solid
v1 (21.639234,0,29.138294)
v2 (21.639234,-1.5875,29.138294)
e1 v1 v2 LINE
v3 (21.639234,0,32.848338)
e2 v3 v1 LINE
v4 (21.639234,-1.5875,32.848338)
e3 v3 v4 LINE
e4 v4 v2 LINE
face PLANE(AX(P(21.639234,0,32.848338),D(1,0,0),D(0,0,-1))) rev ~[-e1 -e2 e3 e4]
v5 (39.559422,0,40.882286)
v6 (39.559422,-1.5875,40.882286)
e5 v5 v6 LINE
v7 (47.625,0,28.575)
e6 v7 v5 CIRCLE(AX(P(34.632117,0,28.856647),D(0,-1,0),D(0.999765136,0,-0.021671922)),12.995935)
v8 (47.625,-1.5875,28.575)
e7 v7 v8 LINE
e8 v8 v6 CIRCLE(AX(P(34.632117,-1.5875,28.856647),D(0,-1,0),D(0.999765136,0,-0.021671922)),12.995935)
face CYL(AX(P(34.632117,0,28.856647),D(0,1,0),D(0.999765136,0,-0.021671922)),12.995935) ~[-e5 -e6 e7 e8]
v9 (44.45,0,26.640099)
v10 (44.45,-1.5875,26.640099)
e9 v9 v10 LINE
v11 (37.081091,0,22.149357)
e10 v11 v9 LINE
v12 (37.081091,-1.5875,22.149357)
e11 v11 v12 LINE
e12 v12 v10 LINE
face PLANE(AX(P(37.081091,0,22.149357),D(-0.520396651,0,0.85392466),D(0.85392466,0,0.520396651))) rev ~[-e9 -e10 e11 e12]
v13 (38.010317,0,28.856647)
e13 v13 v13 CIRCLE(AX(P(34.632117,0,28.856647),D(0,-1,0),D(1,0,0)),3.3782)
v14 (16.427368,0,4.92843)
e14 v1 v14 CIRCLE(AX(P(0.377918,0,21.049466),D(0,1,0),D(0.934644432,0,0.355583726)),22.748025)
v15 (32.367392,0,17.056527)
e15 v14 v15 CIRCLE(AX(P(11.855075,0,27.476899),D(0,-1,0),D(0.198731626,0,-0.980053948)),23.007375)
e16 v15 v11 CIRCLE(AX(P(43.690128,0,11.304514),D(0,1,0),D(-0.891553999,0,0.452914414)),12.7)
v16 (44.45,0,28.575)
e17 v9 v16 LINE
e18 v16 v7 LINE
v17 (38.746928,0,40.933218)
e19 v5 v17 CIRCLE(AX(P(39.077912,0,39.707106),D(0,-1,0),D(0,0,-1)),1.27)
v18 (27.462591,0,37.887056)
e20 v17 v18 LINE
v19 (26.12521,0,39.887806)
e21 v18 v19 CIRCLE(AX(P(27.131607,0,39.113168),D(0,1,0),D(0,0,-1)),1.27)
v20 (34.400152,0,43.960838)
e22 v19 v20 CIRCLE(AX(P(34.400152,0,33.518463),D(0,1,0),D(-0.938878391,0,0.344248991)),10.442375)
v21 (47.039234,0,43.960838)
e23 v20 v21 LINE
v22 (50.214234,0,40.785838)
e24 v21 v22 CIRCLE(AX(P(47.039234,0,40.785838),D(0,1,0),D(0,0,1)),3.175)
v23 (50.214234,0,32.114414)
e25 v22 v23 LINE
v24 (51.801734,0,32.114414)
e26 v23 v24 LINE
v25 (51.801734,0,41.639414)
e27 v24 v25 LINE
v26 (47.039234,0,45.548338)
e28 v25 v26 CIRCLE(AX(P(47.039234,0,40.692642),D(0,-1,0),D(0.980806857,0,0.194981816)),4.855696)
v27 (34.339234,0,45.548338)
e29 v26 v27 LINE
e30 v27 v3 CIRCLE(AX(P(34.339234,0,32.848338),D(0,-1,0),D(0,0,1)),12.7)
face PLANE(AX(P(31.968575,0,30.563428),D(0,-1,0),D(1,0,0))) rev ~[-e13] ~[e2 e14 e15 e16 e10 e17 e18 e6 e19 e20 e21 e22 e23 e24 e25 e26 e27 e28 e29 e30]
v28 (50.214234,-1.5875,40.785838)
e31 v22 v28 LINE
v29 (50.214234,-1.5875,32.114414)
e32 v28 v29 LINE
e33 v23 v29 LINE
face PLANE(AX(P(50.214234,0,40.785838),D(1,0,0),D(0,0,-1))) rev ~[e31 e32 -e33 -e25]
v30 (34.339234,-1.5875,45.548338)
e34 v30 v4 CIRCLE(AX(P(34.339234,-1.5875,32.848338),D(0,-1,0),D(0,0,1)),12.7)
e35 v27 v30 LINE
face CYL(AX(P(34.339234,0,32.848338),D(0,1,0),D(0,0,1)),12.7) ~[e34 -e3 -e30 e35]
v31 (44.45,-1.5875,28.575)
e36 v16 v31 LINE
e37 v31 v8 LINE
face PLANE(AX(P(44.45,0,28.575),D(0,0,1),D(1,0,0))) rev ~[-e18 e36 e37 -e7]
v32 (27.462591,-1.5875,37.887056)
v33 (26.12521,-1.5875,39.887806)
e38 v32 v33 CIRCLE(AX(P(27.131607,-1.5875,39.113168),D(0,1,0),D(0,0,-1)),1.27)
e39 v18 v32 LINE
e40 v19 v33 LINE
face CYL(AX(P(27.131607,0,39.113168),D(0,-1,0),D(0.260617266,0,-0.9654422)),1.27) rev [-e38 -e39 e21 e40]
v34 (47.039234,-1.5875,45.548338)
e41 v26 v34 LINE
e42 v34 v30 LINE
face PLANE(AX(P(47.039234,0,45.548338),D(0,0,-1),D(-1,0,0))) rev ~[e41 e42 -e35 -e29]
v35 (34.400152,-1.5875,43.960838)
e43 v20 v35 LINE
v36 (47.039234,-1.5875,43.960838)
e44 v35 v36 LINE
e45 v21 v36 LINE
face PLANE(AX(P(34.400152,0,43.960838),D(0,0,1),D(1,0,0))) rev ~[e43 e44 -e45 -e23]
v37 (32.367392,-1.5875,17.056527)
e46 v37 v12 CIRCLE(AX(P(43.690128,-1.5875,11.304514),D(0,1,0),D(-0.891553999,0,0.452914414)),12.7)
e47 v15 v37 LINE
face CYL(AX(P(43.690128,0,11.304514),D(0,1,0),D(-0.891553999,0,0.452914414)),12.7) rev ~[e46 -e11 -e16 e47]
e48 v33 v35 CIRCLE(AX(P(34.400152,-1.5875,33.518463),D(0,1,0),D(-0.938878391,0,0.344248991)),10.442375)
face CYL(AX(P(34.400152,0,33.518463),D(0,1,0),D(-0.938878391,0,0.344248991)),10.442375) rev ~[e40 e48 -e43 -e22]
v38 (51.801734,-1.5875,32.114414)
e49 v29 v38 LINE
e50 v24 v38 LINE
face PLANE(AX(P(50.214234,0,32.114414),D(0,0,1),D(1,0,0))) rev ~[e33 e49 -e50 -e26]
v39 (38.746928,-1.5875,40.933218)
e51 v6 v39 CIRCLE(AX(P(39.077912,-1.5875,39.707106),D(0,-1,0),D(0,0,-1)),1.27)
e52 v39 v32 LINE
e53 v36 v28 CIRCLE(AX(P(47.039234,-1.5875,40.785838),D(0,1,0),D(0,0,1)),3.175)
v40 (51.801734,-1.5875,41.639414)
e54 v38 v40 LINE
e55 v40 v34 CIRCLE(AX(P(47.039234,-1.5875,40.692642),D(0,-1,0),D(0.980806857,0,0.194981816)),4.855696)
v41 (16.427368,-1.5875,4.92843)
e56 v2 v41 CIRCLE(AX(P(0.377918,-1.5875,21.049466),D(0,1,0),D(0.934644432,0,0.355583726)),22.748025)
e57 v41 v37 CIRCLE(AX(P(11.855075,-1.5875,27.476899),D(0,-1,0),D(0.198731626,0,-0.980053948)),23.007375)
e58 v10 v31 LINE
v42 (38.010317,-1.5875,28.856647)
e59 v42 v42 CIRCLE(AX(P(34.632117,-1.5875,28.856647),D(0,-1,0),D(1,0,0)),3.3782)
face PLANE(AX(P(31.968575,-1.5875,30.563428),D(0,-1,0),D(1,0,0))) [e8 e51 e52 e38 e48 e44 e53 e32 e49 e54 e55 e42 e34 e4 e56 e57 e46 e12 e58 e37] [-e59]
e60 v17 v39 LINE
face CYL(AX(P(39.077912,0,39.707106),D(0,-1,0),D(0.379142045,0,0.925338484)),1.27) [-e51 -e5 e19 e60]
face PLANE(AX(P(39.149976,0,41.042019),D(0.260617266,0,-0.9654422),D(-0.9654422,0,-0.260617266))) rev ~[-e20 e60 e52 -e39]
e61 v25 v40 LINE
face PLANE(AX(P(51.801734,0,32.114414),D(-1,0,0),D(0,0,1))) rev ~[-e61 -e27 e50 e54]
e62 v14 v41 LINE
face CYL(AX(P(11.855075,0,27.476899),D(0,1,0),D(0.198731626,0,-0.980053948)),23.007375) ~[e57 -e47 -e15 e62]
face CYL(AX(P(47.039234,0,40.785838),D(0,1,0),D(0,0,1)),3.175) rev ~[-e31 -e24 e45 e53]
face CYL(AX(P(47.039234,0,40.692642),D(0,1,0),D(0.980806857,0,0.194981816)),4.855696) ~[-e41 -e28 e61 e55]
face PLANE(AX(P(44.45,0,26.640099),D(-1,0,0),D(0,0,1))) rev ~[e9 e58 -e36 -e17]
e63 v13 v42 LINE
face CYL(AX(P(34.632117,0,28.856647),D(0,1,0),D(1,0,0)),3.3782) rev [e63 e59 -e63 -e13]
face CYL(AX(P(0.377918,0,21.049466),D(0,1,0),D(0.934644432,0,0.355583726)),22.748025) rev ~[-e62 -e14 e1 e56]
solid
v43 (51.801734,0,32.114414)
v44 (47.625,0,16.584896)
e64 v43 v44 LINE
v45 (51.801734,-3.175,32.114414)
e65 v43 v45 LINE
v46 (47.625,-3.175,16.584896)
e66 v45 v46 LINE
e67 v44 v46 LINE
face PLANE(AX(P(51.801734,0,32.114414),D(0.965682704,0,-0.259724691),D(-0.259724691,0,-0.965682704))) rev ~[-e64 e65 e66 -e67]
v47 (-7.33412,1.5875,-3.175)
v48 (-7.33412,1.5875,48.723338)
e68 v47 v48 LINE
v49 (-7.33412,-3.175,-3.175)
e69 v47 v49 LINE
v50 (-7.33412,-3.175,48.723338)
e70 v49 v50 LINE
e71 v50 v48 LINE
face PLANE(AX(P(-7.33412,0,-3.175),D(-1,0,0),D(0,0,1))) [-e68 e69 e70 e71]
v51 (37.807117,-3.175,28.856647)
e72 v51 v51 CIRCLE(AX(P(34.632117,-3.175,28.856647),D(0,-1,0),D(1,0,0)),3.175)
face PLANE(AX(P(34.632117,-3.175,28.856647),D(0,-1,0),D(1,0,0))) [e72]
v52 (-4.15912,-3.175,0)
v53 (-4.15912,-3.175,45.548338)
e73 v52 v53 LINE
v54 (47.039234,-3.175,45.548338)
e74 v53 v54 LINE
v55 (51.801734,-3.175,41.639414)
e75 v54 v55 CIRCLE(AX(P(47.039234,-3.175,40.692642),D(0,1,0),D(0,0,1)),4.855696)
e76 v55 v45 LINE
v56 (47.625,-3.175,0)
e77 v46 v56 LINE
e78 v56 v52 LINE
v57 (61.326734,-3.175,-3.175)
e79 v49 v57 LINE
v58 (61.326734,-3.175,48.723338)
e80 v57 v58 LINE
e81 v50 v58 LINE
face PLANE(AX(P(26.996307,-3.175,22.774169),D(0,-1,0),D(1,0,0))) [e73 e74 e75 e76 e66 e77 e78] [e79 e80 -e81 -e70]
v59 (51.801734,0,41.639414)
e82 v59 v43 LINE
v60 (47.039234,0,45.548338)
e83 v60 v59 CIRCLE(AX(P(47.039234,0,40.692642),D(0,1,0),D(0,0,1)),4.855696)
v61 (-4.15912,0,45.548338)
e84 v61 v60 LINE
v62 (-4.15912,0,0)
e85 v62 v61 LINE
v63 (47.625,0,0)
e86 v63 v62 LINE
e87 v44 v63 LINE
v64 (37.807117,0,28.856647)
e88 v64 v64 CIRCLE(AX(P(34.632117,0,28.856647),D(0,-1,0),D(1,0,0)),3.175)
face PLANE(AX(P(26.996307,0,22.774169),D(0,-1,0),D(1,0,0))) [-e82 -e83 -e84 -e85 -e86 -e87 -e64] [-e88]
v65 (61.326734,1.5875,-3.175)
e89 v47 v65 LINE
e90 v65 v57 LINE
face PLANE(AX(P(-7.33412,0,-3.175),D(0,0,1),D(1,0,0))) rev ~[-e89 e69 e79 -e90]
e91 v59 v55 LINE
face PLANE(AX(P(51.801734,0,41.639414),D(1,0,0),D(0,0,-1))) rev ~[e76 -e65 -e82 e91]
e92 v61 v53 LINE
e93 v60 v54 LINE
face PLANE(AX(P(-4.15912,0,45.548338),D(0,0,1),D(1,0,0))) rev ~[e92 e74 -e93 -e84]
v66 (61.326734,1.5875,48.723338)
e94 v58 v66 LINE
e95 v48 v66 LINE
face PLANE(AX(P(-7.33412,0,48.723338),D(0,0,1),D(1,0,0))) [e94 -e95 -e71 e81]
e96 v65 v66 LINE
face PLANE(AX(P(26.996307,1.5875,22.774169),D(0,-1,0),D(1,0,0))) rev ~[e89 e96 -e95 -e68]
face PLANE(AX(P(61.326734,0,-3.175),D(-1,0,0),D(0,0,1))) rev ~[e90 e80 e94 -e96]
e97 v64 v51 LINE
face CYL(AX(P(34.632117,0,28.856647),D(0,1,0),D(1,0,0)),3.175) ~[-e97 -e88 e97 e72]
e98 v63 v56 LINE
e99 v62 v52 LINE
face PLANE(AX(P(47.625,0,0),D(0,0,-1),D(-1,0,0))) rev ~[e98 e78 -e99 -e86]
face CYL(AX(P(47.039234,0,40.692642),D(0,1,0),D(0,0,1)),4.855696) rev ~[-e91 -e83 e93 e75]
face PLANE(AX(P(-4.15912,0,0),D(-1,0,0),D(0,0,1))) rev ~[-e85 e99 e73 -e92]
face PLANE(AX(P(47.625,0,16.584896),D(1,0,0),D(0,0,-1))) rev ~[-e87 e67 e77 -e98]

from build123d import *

# Parameters (mm, degrees)
F0_R     = 3.3782
F1_DEPTH = 1.5875
F2_R     = 1.27
F0_W     = 68.6608534306
F0_H     = 51.8983377281
F0_R_2   = 3.175
F3_DEPTH = 1.5875
F4_DEPTH = 3.175


with BuildPart() as f1:
    # F0 (on Front) → F1 (new body)
    with BuildSketch(Plane.XZ):
        with BuildLine():
            Line((37.0810907311, 22.1493569333), (44.45, 26.6400993653))
            Line((44.45, 26.6400993653), (44.45, 28.575))
            Line((44.45, 28.575), (47.625, 28.575))
            ThreePointArc((47.625, 28.575), (45.3798217244, 36.1628892804), (39.1499755584, 41.0420189125))
            Line((39.1499755584, 41.0420189125), (24.5960312701, 37.1132397757))
            ThreePointArc((24.5960312701, 37.1132397757), (28.4208043201, 42.0794558253), (34.4001515145, 43.9608377281))
            Line((34.4001515145, 43.9608377281), (47.0392336093, 43.9608377281))
            Line((47.0392336093, 43.9608377281), (47.0392336093, 45.5483377281))
            Line((47.0392336093, 45.5483377281), (34.3392336093, 45.5483377281))
            ThreePointArc((34.3392336093, 45.5483377281), (25.3589774882, 41.8285938491), (21.6392336093, 32.8483377281))
            Line((21.6392336093, 32.8483377281), (21.6392336093, 29.1382938078))
            ThreePointArc((21.6392336093, 29.1382938078), (22.6164587492, 16.2619847329), (16.4273683424, 4.9284299373))
            ThreePointArc((16.4273683424, 4.9284299373), (25.7864104877, 9.1668684971), (32.3673924103, 17.0565268063))
            ThreePointArc((32.3673924103, 17.0565268063), (34.369647916, 19.9311380738), (37.0810907311, 22.1493569333))
        make_face()
        with Locations((34.6321168046, 28.8566469039)):
            Circle(F0_R, mode=Mode.SUBTRACT)
        with BuildLine():
            Line((50.2142336093, 32.1144140998), (51.8017336093, 32.1144140998))
            Line((51.8017336093, 32.1144140998), (51.8017336093, 41.6394140998))
            ThreePointArc((51.8017336093, 41.6394140998), (50.1198622051, 44.4459750797), (47.0392336093, 45.5483377281))
            Line((47.0392336093, 45.5483377281), (47.0392336093, 43.9608377281))
            ThreePointArc((47.0392336093, 43.9608377281), (49.2842976395, 43.0309017583), (50.2142336093, 40.7858377281))
            Line((50.2142336093, 40.7858377281), (50.2142336093, 32.1144140998))
        make_face()
    extrude(amount=F1_DEPTH)

    # F2
    f2_edges = [f1.edges().sort_by_distance(p)[0] for p in [
        (24.596031, -0.79375, 37.11324),
        (39.149976, -0.79375, 41.042019),
    ]]
    fillet(f2_edges, radius=F2_R)


with BuildPart() as f3:
    # F0 (on Front) → F3 (new body)
    with BuildSketch(Plane.XZ):
        with Locations((26.9963068939, 22.774168864)):
            Rectangle(F0_W, F0_H)
        Polygon((47.625, 0), (0, 0), (-4.1591198214, 0), (-4.1591198214, 45.5483377281), (34.3392336093, 45.5483377281), (47.0392336093, 45.5483377281), (58.1517336093, 45.5483377281), (58.1517336093, 0), align=None, mode=Mode.SUBTRACT)
        with BuildLine():
            Line((-4.1591198214, 0), (0, 0))
            Line((0, 0), (47.625, 0))
            Line((47.625, 0), (47.625, 16.5848955512))
            Line((47.625, 16.5848955512), (44.45, 26.6400993653))
            Line((44.45, 26.6400993653), (37.0810907311, 22.1493569333))
            ThreePointArc((37.0810907311, 22.1493569333), (34.369647916, 19.9311380738), (32.3673924103, 17.0565268063))
            ThreePointArc((32.3673924103, 17.0565268063), (25.7864104877, 9.1668684971), (16.4273683424, 4.9284299373))
            ThreePointArc((16.4273683424, 4.9284299373), (22.6164587492, 16.2619847329), (21.6392336093, 29.1382938078))
            Line((21.6392336093, 29.1382938078), (21.6392336093, 32.8483377281))
            ThreePointArc((21.6392336093, 32.8483377281), (25.3589774882, 41.8285938491), (34.3392336093, 45.5483377281))
            Line((34.3392336093, 45.5483377281), (-4.1591198214, 45.5483377281))
            Line((-4.1591198214, 45.5483377281), (-4.1591198214, 0))
        make_face()
        with BuildLine():
            Line((37.0810907311, 22.1493569333), (44.45, 26.6400993653))
            Line((44.45, 26.6400993653), (44.45, 28.575))
            Line((44.45, 28.575), (47.625, 28.575))
            ThreePointArc((47.625, 28.575), (45.3798217244, 36.1628892804), (39.1499755584, 41.0420189125))
            Line((39.1499755584, 41.0420189125), (24.5960312701, 37.1132397757))
            ThreePointArc((24.5960312701, 37.1132397757), (28.4208043201, 42.0794558253), (34.4001515145, 43.9608377281))
            Line((34.4001515145, 43.9608377281), (47.0392336093, 43.9608377281))
            Line((47.0392336093, 43.9608377281), (47.0392336093, 45.5483377281))
            Line((47.0392336093, 45.5483377281), (34.3392336093, 45.5483377281))
            ThreePointArc((34.3392336093, 45.5483377281), (25.3589774882, 41.8285938491), (21.6392336093, 32.8483377281))
            Line((21.6392336093, 32.8483377281), (21.6392336093, 29.1382938078))
            ThreePointArc((21.6392336093, 29.1382938078), (22.6164587492, 16.2619847329), (16.4273683424, 4.9284299373))
            ThreePointArc((16.4273683424, 4.9284299373), (25.7864104877, 9.1668684971), (32.3673924103, 17.0565268063))
            ThreePointArc((32.3673924103, 17.0565268063), (34.369647916, 19.9311380738), (37.0810907311, 22.1493569333))
        make_face()
        with Locations((34.6321168046, 28.8566469039)):
            Circle(F0_R, mode=Mode.SUBTRACT)
        with BuildLine():
            Line((47.625, 16.5848955512), (47.625, 0))
            Line((47.625, 0), (58.1517336093, 0))
            Line((58.1517336093, 0), (58.1517336093, 45.5483377281))
            Line((58.1517336093, 45.5483377281), (47.0392336093, 45.5483377281))
            ThreePointArc((47.0392336093, 45.5483377281), (50.1198622051, 44.4459750797), (51.8017336093, 41.6394140998))
            Line((51.8017336093, 41.6394140998), (51.8017336093, 32.1144140998))
            Line((51.8017336093, 32.1144140998), (47.625, 16.5848955512))
        make_face()
        with BuildLine():
            Line((44.45, 26.6400993653), (47.625, 16.5848955512))
            Line((47.625, 16.5848955512), (51.8017336093, 32.1144140998))
            Line((51.8017336093, 32.1144140998), (50.2142336093, 32.1144140998))
            Line((50.2142336093, 32.1144140998), (50.2142336093, 40.7858377281))
            ThreePointArc((50.2142336093, 40.7858377281), (49.2842976395, 43.0309017583), (47.0392336093, 43.9608377281))
            Line((47.0392336093, 43.9608377281), (34.4001515145, 43.9608377281))
            ThreePointArc((34.4001515145, 43.9608377281), (28.4208043201, 42.0794558253), (24.5960312701, 37.1132397757))
            Line((24.5960312701, 37.1132397757), (39.1499755584, 41.0420189125))
            ThreePointArc((39.1499755584, 41.0420189125), (45.3798217244, 36.1628892804), (47.625, 28.575))
            Line((47.625, 28.575), (44.45, 28.575))
            Line((44.45, 28.575), (44.45, 26.6400993653))
        make_face()
        with Locations((34.6321168046, 28.8566469039)):
            Circle(F0_R)
        with Locations((34.6321168046, 28.8566469039)):
            Circle(F0_R_2, mode=Mode.SUBTRACT)
        with Locations((34.6321168046, 28.8566469039)):
            Circle(F0_R_2)
        with BuildLine():
            Line((50.2142336093, 32.1144140998), (51.8017336093, 32.1144140998))
            Line((51.8017336093, 32.1144140998), (51.8017336093, 41.6394140998))
            ThreePointArc((51.8017336093, 41.6394140998), (50.1198622051, 44.4459750797), (47.0392336093, 45.5483377281))
            Line((47.0392336093, 45.5483377281), (47.0392336093, 43.9608377281))
            ThreePointArc((47.0392336093, 43.9608377281), (49.2842976395, 43.0309017583), (50.2142336093, 40.7858377281))
            Line((50.2142336093, 40.7858377281), (50.2142336093, 32.1144140998))
        make_face()
    extrude(amount=-F3_DEPTH)

    # F0 (on Front) → F4 (join)
    with BuildSketch(Plane.XZ):
        with Locations((26.9963068939, 22.774168864)):
            Rectangle(F0_W, F0_H)
        Polygon((47.625, 0), (0, 0), (-4.1591198214, 0), (-4.1591198214, 45.5483377281), (34.3392336093, 45.5483377281), (47.0392336093, 45.5483377281), (58.1517336093, 45.5483377281), (58.1517336093, 0), align=None, mode=Mode.SUBTRACT)
        with Locations((34.6321168046, 28.8566469039)):
            Circle(F0_R_2)
        with BuildLine():
            Line((47.625, 16.5848955512), (47.625, 0))
            Line((47.625, 0), (58.1517336093, 0))
            Line((58.1517336093, 0), (58.1517336093, 45.5483377281))
            Line((58.1517336093, 45.5483377281), (47.0392336093, 45.5483377281))
            ThreePointArc((47.0392336093, 45.5483377281), (50.1198622051, 44.4459750797), (51.8017336093, 41.6394140998))
            Line((51.8017336093, 41.6394140998), (51.8017336093, 32.1144140998))
            Line((51.8017336093, 32.1144140998), (47.625, 16.5848955512))
        make_face()
    extrude(amount=F4_DEPTH)


solid = Compound([f1.part, f3.part])
